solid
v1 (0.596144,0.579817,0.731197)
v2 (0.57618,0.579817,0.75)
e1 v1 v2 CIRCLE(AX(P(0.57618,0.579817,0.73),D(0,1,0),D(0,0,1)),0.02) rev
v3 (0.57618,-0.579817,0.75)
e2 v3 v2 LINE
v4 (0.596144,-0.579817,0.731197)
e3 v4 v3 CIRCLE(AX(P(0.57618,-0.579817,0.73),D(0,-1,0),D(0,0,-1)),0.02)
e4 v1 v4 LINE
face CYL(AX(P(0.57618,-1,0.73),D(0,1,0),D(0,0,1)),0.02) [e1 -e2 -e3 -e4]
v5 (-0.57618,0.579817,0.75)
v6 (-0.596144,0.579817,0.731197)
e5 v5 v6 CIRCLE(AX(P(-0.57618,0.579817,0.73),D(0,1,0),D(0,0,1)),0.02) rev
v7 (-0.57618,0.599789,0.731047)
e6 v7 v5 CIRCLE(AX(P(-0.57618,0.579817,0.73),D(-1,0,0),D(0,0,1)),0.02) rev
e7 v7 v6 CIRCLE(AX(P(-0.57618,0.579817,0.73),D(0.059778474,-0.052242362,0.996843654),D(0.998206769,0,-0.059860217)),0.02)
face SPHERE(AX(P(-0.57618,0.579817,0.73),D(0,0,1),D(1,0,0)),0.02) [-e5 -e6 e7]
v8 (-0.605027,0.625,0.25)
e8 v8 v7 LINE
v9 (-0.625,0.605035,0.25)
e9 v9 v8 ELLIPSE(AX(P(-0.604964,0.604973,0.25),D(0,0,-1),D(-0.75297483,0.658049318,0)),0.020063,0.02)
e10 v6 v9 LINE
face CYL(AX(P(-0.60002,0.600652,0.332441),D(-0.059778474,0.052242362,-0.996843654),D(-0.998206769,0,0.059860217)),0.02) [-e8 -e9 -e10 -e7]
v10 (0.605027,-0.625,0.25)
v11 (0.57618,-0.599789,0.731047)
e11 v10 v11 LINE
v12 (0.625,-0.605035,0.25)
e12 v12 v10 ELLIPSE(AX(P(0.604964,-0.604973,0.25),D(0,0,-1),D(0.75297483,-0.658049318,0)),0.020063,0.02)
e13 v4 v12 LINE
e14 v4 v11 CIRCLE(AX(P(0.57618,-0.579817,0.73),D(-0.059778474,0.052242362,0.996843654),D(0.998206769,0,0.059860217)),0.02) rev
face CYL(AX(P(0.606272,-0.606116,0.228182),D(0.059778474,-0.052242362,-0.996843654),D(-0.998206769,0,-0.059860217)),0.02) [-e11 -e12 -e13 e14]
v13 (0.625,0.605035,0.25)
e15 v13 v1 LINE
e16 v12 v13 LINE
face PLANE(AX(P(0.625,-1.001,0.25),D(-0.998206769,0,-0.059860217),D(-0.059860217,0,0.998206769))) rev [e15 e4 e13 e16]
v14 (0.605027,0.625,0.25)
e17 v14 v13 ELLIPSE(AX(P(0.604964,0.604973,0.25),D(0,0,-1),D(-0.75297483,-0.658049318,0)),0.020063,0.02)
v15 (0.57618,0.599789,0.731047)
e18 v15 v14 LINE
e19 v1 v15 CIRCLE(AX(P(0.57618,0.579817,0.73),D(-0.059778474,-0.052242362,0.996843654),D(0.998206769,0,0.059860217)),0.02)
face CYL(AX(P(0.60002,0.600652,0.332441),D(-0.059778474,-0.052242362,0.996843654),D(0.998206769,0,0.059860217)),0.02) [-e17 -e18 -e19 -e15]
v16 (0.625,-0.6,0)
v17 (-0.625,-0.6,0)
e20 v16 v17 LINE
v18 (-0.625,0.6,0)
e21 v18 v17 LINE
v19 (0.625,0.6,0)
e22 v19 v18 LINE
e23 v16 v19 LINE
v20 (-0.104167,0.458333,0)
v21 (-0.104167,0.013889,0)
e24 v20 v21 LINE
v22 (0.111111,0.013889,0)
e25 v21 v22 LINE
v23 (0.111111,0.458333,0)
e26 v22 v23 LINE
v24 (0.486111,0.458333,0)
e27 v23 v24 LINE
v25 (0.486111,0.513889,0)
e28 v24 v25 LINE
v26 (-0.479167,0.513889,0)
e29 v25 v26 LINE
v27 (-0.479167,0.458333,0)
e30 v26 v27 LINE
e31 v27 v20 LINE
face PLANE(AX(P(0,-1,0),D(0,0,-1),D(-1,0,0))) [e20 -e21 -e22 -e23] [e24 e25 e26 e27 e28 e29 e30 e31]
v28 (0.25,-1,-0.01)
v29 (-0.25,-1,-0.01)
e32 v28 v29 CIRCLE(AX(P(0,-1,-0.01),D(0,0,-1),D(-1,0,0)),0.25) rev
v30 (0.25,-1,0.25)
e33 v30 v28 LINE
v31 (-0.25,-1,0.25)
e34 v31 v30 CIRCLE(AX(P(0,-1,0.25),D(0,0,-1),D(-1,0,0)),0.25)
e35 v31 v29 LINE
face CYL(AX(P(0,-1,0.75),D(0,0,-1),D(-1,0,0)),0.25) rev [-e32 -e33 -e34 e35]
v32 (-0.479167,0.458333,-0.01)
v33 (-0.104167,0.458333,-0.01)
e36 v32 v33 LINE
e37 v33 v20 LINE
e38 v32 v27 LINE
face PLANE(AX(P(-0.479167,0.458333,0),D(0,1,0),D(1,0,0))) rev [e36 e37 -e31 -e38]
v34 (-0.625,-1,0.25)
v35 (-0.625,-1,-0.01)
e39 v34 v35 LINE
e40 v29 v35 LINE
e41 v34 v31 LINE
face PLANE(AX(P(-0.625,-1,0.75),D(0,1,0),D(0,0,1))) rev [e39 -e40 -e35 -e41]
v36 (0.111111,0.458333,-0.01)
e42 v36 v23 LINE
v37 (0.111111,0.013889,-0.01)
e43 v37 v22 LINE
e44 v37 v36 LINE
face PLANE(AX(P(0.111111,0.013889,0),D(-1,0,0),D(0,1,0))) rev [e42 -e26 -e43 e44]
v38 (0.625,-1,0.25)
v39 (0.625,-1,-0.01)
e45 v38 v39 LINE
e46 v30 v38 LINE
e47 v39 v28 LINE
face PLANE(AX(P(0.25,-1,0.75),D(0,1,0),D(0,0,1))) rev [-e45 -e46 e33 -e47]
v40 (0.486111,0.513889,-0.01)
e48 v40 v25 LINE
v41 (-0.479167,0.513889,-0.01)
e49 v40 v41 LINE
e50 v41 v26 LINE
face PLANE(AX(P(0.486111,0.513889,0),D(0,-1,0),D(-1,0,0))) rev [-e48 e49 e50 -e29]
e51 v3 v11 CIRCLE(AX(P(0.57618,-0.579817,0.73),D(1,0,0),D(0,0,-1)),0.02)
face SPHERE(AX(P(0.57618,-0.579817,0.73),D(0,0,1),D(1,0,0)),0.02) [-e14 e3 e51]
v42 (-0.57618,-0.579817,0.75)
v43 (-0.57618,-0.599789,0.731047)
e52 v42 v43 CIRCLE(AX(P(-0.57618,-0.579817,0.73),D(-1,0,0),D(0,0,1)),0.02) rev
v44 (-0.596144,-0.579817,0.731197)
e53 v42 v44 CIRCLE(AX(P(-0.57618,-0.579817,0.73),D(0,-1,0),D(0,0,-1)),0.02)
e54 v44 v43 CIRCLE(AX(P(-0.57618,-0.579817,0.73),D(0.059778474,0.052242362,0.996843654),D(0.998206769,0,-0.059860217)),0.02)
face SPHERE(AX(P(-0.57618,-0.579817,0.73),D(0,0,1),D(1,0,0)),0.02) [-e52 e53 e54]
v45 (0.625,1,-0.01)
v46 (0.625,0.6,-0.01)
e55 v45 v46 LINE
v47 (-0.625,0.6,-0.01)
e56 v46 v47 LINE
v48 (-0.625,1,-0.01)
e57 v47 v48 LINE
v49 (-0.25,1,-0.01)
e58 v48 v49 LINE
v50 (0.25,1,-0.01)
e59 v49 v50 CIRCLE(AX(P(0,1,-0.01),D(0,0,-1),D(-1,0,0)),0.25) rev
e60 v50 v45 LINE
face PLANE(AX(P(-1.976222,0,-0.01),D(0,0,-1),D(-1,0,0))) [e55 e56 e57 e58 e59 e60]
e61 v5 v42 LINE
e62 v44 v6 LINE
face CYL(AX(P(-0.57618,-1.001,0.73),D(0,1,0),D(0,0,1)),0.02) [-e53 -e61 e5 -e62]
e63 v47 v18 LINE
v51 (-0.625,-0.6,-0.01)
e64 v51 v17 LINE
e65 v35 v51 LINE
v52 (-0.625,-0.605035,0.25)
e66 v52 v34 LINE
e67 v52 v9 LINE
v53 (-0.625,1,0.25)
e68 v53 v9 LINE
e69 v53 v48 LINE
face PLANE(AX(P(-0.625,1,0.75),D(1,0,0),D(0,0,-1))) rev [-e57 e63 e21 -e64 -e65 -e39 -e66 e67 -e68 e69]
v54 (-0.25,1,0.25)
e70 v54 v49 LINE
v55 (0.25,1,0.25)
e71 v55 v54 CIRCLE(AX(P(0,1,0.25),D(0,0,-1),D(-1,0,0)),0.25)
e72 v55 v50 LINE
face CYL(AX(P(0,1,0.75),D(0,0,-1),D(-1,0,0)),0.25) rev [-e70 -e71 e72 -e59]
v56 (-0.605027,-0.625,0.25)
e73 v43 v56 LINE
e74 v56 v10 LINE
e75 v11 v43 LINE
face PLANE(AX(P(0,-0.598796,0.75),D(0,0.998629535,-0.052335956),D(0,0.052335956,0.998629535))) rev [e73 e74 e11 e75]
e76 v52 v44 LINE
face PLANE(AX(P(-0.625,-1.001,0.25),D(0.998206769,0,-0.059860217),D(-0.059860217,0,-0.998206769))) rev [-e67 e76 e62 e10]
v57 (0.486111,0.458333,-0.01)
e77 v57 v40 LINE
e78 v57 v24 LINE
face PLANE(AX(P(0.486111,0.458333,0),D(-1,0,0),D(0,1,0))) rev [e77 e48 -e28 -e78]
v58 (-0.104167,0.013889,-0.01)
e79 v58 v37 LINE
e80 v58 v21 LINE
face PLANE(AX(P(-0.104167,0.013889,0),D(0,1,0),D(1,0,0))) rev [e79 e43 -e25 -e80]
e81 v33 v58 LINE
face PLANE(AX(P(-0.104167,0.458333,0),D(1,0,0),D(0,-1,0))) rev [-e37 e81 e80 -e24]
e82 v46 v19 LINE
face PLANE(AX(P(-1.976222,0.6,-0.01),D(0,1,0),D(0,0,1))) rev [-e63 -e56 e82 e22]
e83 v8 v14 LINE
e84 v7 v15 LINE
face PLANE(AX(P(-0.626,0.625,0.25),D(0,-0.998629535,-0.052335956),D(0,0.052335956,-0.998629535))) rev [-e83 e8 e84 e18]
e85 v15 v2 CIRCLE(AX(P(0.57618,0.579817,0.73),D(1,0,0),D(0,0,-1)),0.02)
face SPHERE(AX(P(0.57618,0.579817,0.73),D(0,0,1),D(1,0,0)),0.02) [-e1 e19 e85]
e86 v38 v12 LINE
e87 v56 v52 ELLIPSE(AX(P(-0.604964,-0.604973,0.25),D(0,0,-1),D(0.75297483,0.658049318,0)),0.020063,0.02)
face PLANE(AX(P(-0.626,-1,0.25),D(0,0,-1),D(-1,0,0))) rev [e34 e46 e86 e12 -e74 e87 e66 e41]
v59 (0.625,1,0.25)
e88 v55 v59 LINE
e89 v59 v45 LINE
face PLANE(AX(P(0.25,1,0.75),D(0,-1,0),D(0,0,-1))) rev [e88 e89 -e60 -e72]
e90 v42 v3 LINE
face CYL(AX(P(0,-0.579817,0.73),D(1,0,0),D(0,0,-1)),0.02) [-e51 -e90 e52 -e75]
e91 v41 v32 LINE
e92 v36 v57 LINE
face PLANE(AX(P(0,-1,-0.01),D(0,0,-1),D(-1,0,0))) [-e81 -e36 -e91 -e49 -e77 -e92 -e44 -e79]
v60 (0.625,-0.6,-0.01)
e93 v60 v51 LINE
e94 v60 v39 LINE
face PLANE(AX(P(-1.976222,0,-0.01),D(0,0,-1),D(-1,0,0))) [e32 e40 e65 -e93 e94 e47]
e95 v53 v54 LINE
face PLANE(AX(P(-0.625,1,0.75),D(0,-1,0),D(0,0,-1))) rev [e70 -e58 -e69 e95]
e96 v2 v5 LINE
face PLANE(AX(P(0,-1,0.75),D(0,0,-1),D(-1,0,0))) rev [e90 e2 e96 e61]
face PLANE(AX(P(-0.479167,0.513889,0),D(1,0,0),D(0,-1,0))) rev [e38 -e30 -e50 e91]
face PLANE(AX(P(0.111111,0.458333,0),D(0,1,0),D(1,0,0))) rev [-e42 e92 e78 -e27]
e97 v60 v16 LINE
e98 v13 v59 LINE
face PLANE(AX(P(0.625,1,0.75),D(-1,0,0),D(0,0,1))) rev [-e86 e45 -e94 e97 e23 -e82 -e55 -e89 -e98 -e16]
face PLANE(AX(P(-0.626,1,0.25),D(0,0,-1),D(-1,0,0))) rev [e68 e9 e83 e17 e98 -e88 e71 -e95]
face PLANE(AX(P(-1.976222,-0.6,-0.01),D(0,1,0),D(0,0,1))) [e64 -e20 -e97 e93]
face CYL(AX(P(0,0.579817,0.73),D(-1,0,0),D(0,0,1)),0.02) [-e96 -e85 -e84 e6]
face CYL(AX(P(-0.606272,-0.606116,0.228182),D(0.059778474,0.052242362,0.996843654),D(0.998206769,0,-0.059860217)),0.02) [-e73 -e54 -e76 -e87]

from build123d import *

# Parameters (mm, degrees)
EXTRUDE_1_DEPTH     = 0.75
CUT_EXTRUDE_1_REACH = 3.768
SKETCH_2_W          = 0.5
SKETCH_2_H          = 0.375
EXTRUDE_START       = 0.01
EXTRUDE_2_DEPTH     = 0.01
WRAP_1_DEPTH        = 0.01
CUT_EXTRUDE_2_REACH = 3.896
CHAMFER_1_SIZE      = 0.5
CHAMFER_1_SIZE_2    = 0.02620389
CHAMFER_2_SIZE      = 0.02620389
CHAMFER_2_SIZE_2    = 0.5
FILLET_1_R          = 0.02


with BuildPart() as part:
    # 草图1 → 凸台-拉伸1 (new body)
    with BuildSketch(Plane.XY):
        with BuildLine():
            Line((-0.625, 1), (-0.25, 1))
            ThreePointArc((-0.25, 1), (0, 0.75), (0.25, 1))
            Line((0.25, 1), (0.625, 1))
            Line((0.625, 1), (0.625, -1))
            Line((0.625, -1), (0.25, -1))
            ThreePointArc((0.25, -1), (0, -0.75), (-0.25, -1))
            Line((-0.25, -1), (-0.625, -1))
            Line((-0.625, -1), (-0.625, 1))
        make_face()
    extrude(amount=EXTRUDE_1_DEPTH)

    # 草图2 → 切除-拉伸1 (cut, up to next)
    with BuildSketch(Plane(origin=(0.625, 0, 0), x_dir=(0, 0, -1), z_dir=(1, 0, 0)), mode=Mode.PRIVATE) as cut_extrude_1_sk1:
        with Locations((-0.5, 0.8125)):
            Rectangle(SKETCH_2_W, SKETCH_2_H)
    cut_extrude_1_tool1 = extrude(cut_extrude_1_sk1.sketch, amount=-CUT_EXTRUDE_1_REACH, mode=Mode.PRIVATE) & part.part
    # 草图2 → 切除-拉伸1 (cut, up to next)
    with BuildSketch(Plane(origin=(0.625, 0, 0), x_dir=(0, 0, -1), z_dir=(1, 0, 0)), mode=Mode.PRIVATE) as cut_extrude_1_sk2:
        with Locations((-0.5, -0.8125)):
            Rectangle(SKETCH_2_W, SKETCH_2_H)
    cut_extrude_1_tool2 = extrude(cut_extrude_1_sk2.sketch, amount=-CUT_EXTRUDE_1_REACH, mode=Mode.PRIVATE) & part.part
    add(cut_extrude_1_tool1.solids().sort_by_distance((0.625, 0.8125, 0.5))[0], mode=Mode.SUBTRACT)
    add(cut_extrude_1_tool2.solids().sort_by_distance((0.625, -0.8125, 0.5))[0], mode=Mode.SUBTRACT)

    # 草图3 → 凸台-拉伸2 (add)
    with BuildSketch(Plane(origin=(0, 0, 0), x_dir=(-1, 0, 0), z_dir=(0, 0, -1)).offset(EXTRUDE_START)):
        with BuildLine():
            Line((-0.625, 1), (-0.625, 0.6))
            Line((-0.625, 0.6), (0.625, 0.6))
            Line((0.625, 0.6), (0.625, 1))
            Line((0.625, 1), (0.25, 1))
            ThreePointArc((0.25, 1), (0, 0.75), (-0.25, 1))
            Line((-0.25, 1), (-0.625, 1))
        make_face()
        with BuildLine():
            Line((0.625, -0.6), (-0.625, -0.6))
            Line((-0.625, -0.6), (-0.625, -1))
            Line((-0.625, -1), (-0.25, -1))
            ThreePointArc((-0.25, -1), (0, -0.75), (0.25, -1))
            Line((0.25, -1), (0.625, -1))
            Line((0.625, -1), (0.625, -0.6))
        make_face()
    extrude(amount=-EXTRUDE_2_DEPTH)

    # 包覆1: read off the stored shape, not the designer's step
    # 包覆1 outline → 包覆1 (add)
    with BuildSketch(Plane(origin=(0, 0, 0), x_dir=(-1, 0, 0), z_dir=(0, 0, -1))):
        Polygon((0.104166667, 0.013888889), (0.104166667, 0.458333333), (0.479166667, 0.458333333), (0.479166667, 0.513888889), (-0.486111111, 0.513888889), (-0.486111111, 0.458333333), (-0.111111111, 0.458333333), (-0.111111111, 0.013888889), align=None)
    extrude(amount=WRAP_1_DEPTH)

    # 草图7 → 切除-拉伸2 (cut, up to next)
    with BuildSketch(Plane(origin=(0, 0.625, 0), x_dir=(1, 0, 0), z_dir=(0, 1, 0)), mode=Mode.PRIVATE) as cut_extrude_2_sk1:
        Polygon((-0.625, -0.25), (-0.595016124, -0.75), (-0.625, -0.75), align=None)
    cut_extrude_2_tool1 = extrude(cut_extrude_2_sk1.sketch, amount=-CUT_EXTRUDE_2_REACH, mode=Mode.PRIVATE) & part.part
    # 草图7 → 切除-拉伸2 (cut, up to next)
    with BuildSketch(Plane(origin=(0, 0.625, 0), x_dir=(1, 0, 0), z_dir=(0, 1, 0)), mode=Mode.PRIVATE) as cut_extrude_2_sk2:
        Polygon((0.595016124, -0.75), (0.625, -0.75), (0.625, -0.25), align=None)
    cut_extrude_2_tool2 = extrude(cut_extrude_2_sk2.sketch, amount=-CUT_EXTRUDE_2_REACH, mode=Mode.PRIVATE) & part.part
    add(cut_extrude_2_tool1.solids().sort_by_distance((-0.615005, 0.625, 0.583333))[0], mode=Mode.SUBTRACT)
    add(cut_extrude_2_tool2.solids().sort_by_distance((0.615005, 0.625, 0.583333))[0], mode=Mode.SUBTRACT)

    # 倒角1
    # the kernel refuses this chamfer: 0.5, 0.02620389 mm, written as the material it takes off along each edge
    with BuildSketch(Plane(origin=(1.894950234, 0.625, 0.75), x_dir=(0, 0, -1), z_dir=(-1, 0, 0))) as chamfer_1_piece_1_section:
        Polygon((CHAMFER_1_SIZE, 0), (0, CHAMFER_1_SIZE_2 * 0.99999998632), (0, 0), align=None)
    chamfer_1_piece_1 = extrude(amount=3.789900469, mode=Mode.PRIVATE)
    chamfer_1_piece_1 = split(chamfer_1_piece_1, bisect_by=Plane(origin=(1.894950234, 0.625, 0.25), z_dir=(0, 0, 1)), keep=Keep.TOP, mode=Mode.PRIVATE)
    add(chamfer_1_piece_1, mode=Mode.SUBTRACT)

    # 倒角2
    # the kernel refuses this chamfer: 0.5, 0.02620389 mm, written as the material it takes off along each edge
    with BuildSketch(Plane(origin=(1.894950234, -0.625, 0.75), x_dir=(0, 1, 0), z_dir=(-1, 0, 0))) as chamfer_2_piece_1_section:
        Polygon((CHAMFER_2_SIZE * 0.99999998632, 0), (0, CHAMFER_2_SIZE_2), (0, 0), align=None)
    chamfer_2_piece_1 = extrude(amount=3.789900469, mode=Mode.PRIVATE)
    chamfer_2_piece_1 = split(chamfer_2_piece_1, bisect_by=Plane(origin=(1.894950234, -0.625, 0.25), z_dir=(0, 0, 1)), keep=Keep.TOP, mode=Mode.PRIVATE)
    add(chamfer_2_piece_1, mode=Mode.SUBTRACT)

    # 圆角1
    # the kernel refuses this fillet: 0.02 mm, written as the material it takes off along each edge
    with BuildSketch(Plane(origin=(0.57617955, 0.579816819, 0.73), x_dir=(0.04124395278448508, 0.7247571544349799, -0.6877688590318859), z_dir=(0.5553605365793874, 0.5555957455592435, 0.618779477622459))) as fillet_1_piece_1_section:
        Polygon((-0.040070478, -0.040070478), (0.040070478, -0.040070478), (0.040070478, 0.040070478), (-0.040070478, 0.040070478), align=None)
    fillet_1_piece_1 = extrude(amount=0.040070478, mode=Mode.PRIVATE)
    fillet_1_piece_1 = split(fillet_1_piece_1, bisect_by=Plane(origin=(0.57617955, 0.579816819, 0.73), z_dir=(0, 1, 0)), keep=Keep.TOP, mode=Mode.PRIVATE)
    fillet_1_piece_1 = split(fillet_1_piece_1, bisect_by=Plane(origin=(0.57617955, 0.579816819, 0.73), z_dir=(1, 0, 0)), keep=Keep.TOP, mode=Mode.PRIVATE)
    fillet_1_piece_1 = split(fillet_1_piece_1, bisect_by=Plane(origin=(0.57617955, 0.579816819, 0.73), z_dir=(-0.05977847359904646, -0.052242362176689705, 0.9968436535828312)), keep=Keep.TOP, mode=Mode.PRIVATE)
    fillet_1_piece_1 = split(fillet_1_piece_1, bisect_by=Plane(origin=(0.596143685, 0.579816819, 0.731197204), z_dir=(-0.9982067693968444, 0, -0.0598602165909465)), keep=Keep.TOP, mode=Mode.PRIVATE)
    fillet_1_piece_1 = split(fillet_1_piece_1, bisect_by=Plane(origin=(0.57617955, 0.579816819, 0.75), z_dir=(0, 0, -1)), keep=Keep.TOP, mode=Mode.PRIVATE)
    fillet_1_piece_1 = split(fillet_1_piece_1, bisect_by=Plane(origin=(0.57617955, 0.59978941, 0.731046719), z_dir=(0, -0.9986295347545728, -0.05233595624296412)), keep=Keep.TOP, mode=Mode.PRIVATE)
    fillet_1_piece_1 = fillet_1_piece_1 - Plane(origin=(0.57617955, 0.579816819, 0.73), x_dir=(-0.5553605365793874, -0.5555957455592435, -0.618779477622459), z_dir=(0.04124395278448508, 0.7247571544349799, -0.6877688590318859)) * Sphere(FILLET_1_R, mode=Mode.PRIVATE)
    add(fillet_1_piece_1, mode=Mode.SUBTRACT)
    with BuildSketch(Plane(origin=(-0.57617955, 0.579816819, 0.73), x_dir=(0.7072564722746582, 0.7069570584028463, 0), z_dir=(-0.5553605365793893, 0.5555957455592451, 0.6187794776224558))) as fillet_1_piece_2_section:
        Polygon((-0.040070478, -0.040070478), (0.040070478, -0.040070478), (0.040070478, 0.040070478), (-0.040070478, 0.040070478), align=None)
    fillet_1_piece_2 = extrude(amount=0.040070478, mode=Mode.PRIVATE)
    fillet_1_piece_2 = split(fillet_1_piece_2, bisect_by=Plane(origin=(-0.57617955, 0.579816819, 0.73), z_dir=(-1, 0, 0)), keep=Keep.TOP, mode=Mode.PRIVATE)
    fillet_1_piece_2 = split(fillet_1_piece_2, bisect_by=Plane(origin=(-0.57617955, 0.579816819, 0.73), z_dir=(0.0597784735990376, -0.05224236217668974, 0.9968436535828318)), keep=Keep.TOP, mode=Mode.PRIVATE)
    fillet_1_piece_2 = split(fillet_1_piece_2, bisect_by=Plane(origin=(-0.57617955, 0.579816819, 0.73), z_dir=(0, 1, 0)), keep=Keep.TOP, mode=Mode.PRIVATE)
    fillet_1_piece_2 = split(fillet_1_piece_2, bisect_by=Plane(origin=(-0.57617955, 0.579816819, 0.75), z_dir=(0, 0, -1)), keep=Keep.TOP, mode=Mode.PRIVATE)
    fillet_1_piece_2 = split(fillet_1_piece_2, bisect_by=Plane(origin=(-0.57617955, 0.59978941, 0.731046719), z_dir=(0, -0.9986295347545728, -0.05233595624296412)), keep=Keep.TOP, mode=Mode.PRIVATE)
    fillet_1_piece_2 = split(fillet_1_piece_2, bisect_by=Plane(origin=(-0.596143685, 0.579816819, 0.731197204), z_dir=(0.998206769396845, 0, -0.05986021659093763)), keep=Keep.TOP, mode=Mode.PRIVATE)
    fillet_1_piece_2 = fillet_1_piece_2 - Plane(origin=(-0.57617955, 0.579816819, 0.73), x_dir=(0.5553605365793893, -0.5555957455592451, -0.6187794776224558), z_dir=(0.7072564722746582, 0.7069570584028463, 0)) * Sphere(FILLET_1_R, mode=Mode.PRIVATE)
    add(fillet_1_piece_2, mode=Mode.SUBTRACT)
    with BuildSketch(Plane(origin=(0.57617955, -0.579816819, 0.73), x_dir=(-0.04124395278448508, 0.7247571544349799, 0.6877688590318859), z_dir=(0.5553605365793874, -0.5555957455592435, 0.618779477622459))) as fillet_1_piece_3_section:
        Polygon((-0.040070478, -0.040070478), (0.040070478, -0.040070478), (0.040070478, 0.040070478), (-0.040070478, 0.040070478), align=None)
    fillet_1_piece_3 = extrude(amount=0.040070478, mode=Mode.PRIVATE)
    fillet_1_piece_3 = split(fillet_1_piece_3, bisect_by=Plane(origin=(0.57617955, -0.579816819, 0.73), z_dir=(0, -1, 0)), keep=Keep.TOP, mode=Mode.PRIVATE)
    fillet_1_piece_3 = split(fillet_1_piece_3, bisect_by=Plane(origin=(0.57617955, -0.579816819, 0.73), z_dir=(1, 0, 0)), keep=Keep.TOP, mode=Mode.PRIVATE)
    fillet_1_piece_3 = split(fillet_1_piece_3, bisect_by=Plane(origin=(0.57617955, -0.579816819, 0.73), z_dir=(-0.05977847359904646, 0.052242362176689705, 0.9968436535828312)), keep=Keep.TOP, mode=Mode.PRIVATE)
    fillet_1_piece_3 = split(fillet_1_piece_3, bisect_by=Plane(origin=(0.596143685, -0.579816819, 0.731197204), z_dir=(-0.9982067693968444, 0, -0.0598602165909465)), keep=Keep.TOP, mode=Mode.PRIVATE)
    fillet_1_piece_3 = split(fillet_1_piece_3, bisect_by=Plane(origin=(0.57617955, -0.579816819, 0.75), z_dir=(0, 0, -1)), keep=Keep.TOP, mode=Mode.PRIVATE)
    fillet_1_piece_3 = split(fillet_1_piece_3, bisect_by=Plane(origin=(0.57617955, -0.59978941, 0.731046719), z_dir=(0, 0.9986295347545728, -0.05233595624296412)), keep=Keep.TOP, mode=Mode.PRIVATE)
    fillet_1_piece_3 = fillet_1_piece_3 - Plane(origin=(0.57617955, -0.579816819, 0.73), x_dir=(-0.5553605365793874, 0.5555957455592435, -0.618779477622459), z_dir=(-0.04124395278448508, 0.7247571544349799, 0.6877688590318859)) * Sphere(FILLET_1_R, mode=Mode.PRIVATE)
    add(fillet_1_piece_3, mode=Mode.SUBTRACT)
    with BuildSketch(Plane(origin=(-0.57617955, -0.579816819, 0.73), x_dir=(-0.041243952784478954, -0.72475715443498, -0.687768859031886), z_dir=(-0.5553605365793893, -0.5555957455592451, 0.6187794776224558))) as fillet_1_piece_4_section:
        Polygon((-0.040070478, -0.040070478), (0.040070478, -0.040070478), (0.040070478, 0.040070478), (-0.040070478, 0.040070478), align=None)
    fillet_1_piece_4 = extrude(amount=0.040070478, mode=Mode.PRIVATE)
    fillet_1_piece_4 = split(fillet_1_piece_4, bisect_by=Plane(origin=(-0.57617955, -0.579816819, 0.73), z_dir=(0.0597784735990376, 0.05224236217668974, 0.9968436535828318)), keep=Keep.TOP, mode=Mode.PRIVATE)
    fillet_1_piece_4 = split(fillet_1_piece_4, bisect_by=Plane(origin=(-0.57617955, -0.579816819, 0.73), z_dir=(-1, 0, 0)), keep=Keep.TOP, mode=Mode.PRIVATE)
    fillet_1_piece_4 = split(fillet_1_piece_4, bisect_by=Plane(origin=(-0.57617955, -0.579816819, 0.73), z_dir=(0, -1, 0)), keep=Keep.TOP, mode=Mode.PRIVATE)
    fillet_1_piece_4 = split(fillet_1_piece_4, bisect_by=Plane(origin=(-0.596143685, -0.579816819, 0.731197204), z_dir=(0.998206769396845, 0, -0.05986021659093763)), keep=Keep.TOP, mode=Mode.PRIVATE)
    fillet_1_piece_4 = split(fillet_1_piece_4, bisect_by=Plane(origin=(-0.57617955, -0.59978941, 0.731046719), z_dir=(0, 0.9986295347545728, -0.05233595624296412)), keep=Keep.TOP, mode=Mode.PRIVATE)
    fillet_1_piece_4 = split(fillet_1_piece_4, bisect_by=Plane(origin=(-0.57617955, -0.579816819, 0.75), z_dir=(0, 0, -1)), keep=Keep.TOP, mode=Mode.PRIVATE)
    fillet_1_piece_4 = fillet_1_piece_4 - Plane(origin=(-0.57617955, -0.579816819, 0.73), x_dir=(0.5553605365793893, 0.5555957455592451, -0.6187794776224558), z_dir=(-0.041243952784478954, -0.72475715443498, -0.687768859031886)) * Sphere(FILLET_1_R, mode=Mode.PRIVATE)
    add(fillet_1_piece_4, mode=Mode.SUBTRACT)
    with BuildSketch(Plane(origin=(0.596081336, 0.599727034, 0.732236916), x_dir=(-0.9982116679813796, 0.0031285635785502862, -0.059696549278554306), z_dir=(0.059778473599046464, 0.05224236217668971, -0.9968436535828313))) as fillet_1_piece_5_section:
        with BuildLine():
            CenterArc((FILLET_1_R * 0.996872050334, -FILLET_1_R), FILLET_1_R, 90, 89.8205011)
            Line((-FILLET_1_R * 0.00312304230512, -FILLET_1_R * 0.996867158324), (0, 0))
            Line((0, 0), (FILLET_1_R * 0.996872050334, 0))
        make_face()
    fillet_1_piece_5 = extrude(amount=0.533607444, mode=Mode.PRIVATE)
    fillet_1_piece_5 = split(fillet_1_piece_5, bisect_by=Plane(origin=(0.596081336, 0.599727034, 0.25), z_dir=(0, 0, 1)), keep=Keep.TOP, mode=Mode.PRIVATE)
    add(fillet_1_piece_5, mode=Mode.SUBTRACT)
    with BuildSketch(Plane(origin=(0.57617955, 0.59879611, 0.75), x_dir=(0, 0.05233595624296042, -0.9986295347545731), z_dir=(-1, 0, 0)), Plane(origin=(0.57617955, -0.59879611, 0.75), x_dir=(0, 1, 0), z_dir=(-1, 0, 0))) as fillet_1_piece_6:
        with BuildLine():
            CenterArc((FILLET_1_R * 0.948964566715, FILLET_1_R), FILLET_1_R, 183, 87)
            Line((-FILLET_1_R * 0.0496649680397, FILLET_1_R * 0.947664043757), (0, 0))
            Line((0, 0), (FILLET_1_R * 0.948964566715, 0))
        make_face()
    extrude(amount=1.152359099, mode=Mode.SUBTRACT)
    with BuildSketch(Plane(origin=(-0.596081336, 0.599727034, 0.732236916), x_dir=(-0.003127239115103472, -0.9986344354137802, -0.052148679574054314), z_dir=(-0.0597784735990376, 0.05224236217668974, -0.9968436535828318))) as fillet_1_piece_7_section:
        with BuildLine():
            CenterArc((FILLET_1_R * 0.996872050334, -FILLET_1_R), FILLET_1_R, 90, 89.8205011)
            Line((-FILLET_1_R * 0.00312304230511, -FILLET_1_R * 0.996867158324), (0, 0))
            Line((0, 0), (FILLET_1_R * 0.996872050334, 0))
        make_face()
    fillet_1_piece_7 = extrude(amount=0.533607444, mode=Mode.PRIVATE)
    fillet_1_piece_7 = split(fillet_1_piece_7, bisect_by=Plane(origin=(-0.596081336, 0.599727034, 0.25), z_dir=(0, 0, 1)), keep=Keep.TOP, mode=Mode.PRIVATE)
    add(fillet_1_piece_7, mode=Mode.SUBTRACT)
    with BuildSketch(Plane(origin=(0.595016124, 0.579816819, 0.75), x_dir=(0.05986021659094882, 0, -0.9982067693968444), z_dir=(0, -1, 0))) as fillet_1_piece_8:
        with BuildLine():
            CenterArc((FILLET_1_R * 0.941828699456, -FILLET_1_R), FILLET_1_R, 90, 86.568210653)
            Line((-FILLET_1_R * 0.056378069941, -FILLET_1_R * 0.940139783409), (0, 0))
            Line((0, 0), (FILLET_1_R * 0.941828699456, 0))
        make_face()
    extrude(amount=1.159633638, mode=Mode.SUBTRACT)
    with BuildSketch(Plane(origin=(-0.595016124, 0.579816819, 0.75), x_dir=(-0.05986021659093708, 0, -0.998206769396845), z_dir=(0, -1, 0))) as fillet_1_piece_9:
        with BuildLine():
            CenterArc((FILLET_1_R * 0.941828699456, FILLET_1_R), FILLET_1_R, 183.431789347, 86.568210653)
            Line((-FILLET_1_R * 0.056378069941, FILLET_1_R * 0.940139783409), (0, 0))
            Line((0, 0), (FILLET_1_R * 0.941828699456, 0))
        make_face()
    extrude(amount=1.159633638, mode=Mode.SUBTRACT)
    with BuildSketch(Plane(origin=(0.627979574, -0.627603948, 0.200313721), x_dir=(0.003127239115114234, 0.9986344354137802, -0.05214867957405363), z_dir=(-0.059778473599046464, 0.05224236217668971, 0.9968436535828313))) as fillet_1_piece_10_section:
        with BuildLine():
            CenterArc((FILLET_1_R * 0.996872050334, FILLET_1_R), FILLET_1_R, 180.1794989, 89.8205011)
            Line((-FILLET_1_R * 0.00312304230511, FILLET_1_R * 0.996867158324), (0, 0))
            Line((0, 0), (FILLET_1_R * 0.996872050334, 0))
        make_face()
    fillet_1_piece_10 = extrude(amount=0.533607444, mode=Mode.PRIVATE)
    fillet_1_piece_10 = split(fillet_1_piece_10, bisect_by=Plane(origin=(0.627979574, -0.627603948, 0.25), z_dir=(0, 0, 1)), keep=Keep.TOP, mode=Mode.PRIVATE)
    add(fillet_1_piece_10, mode=Mode.SUBTRACT)
    with BuildSketch(Plane(origin=(-0.627979574, -0.627603948, 0.200313721), x_dir=(-0.0031272391150979234, 0.9986344354137803, -0.052148679574054654), z_dir=(0.0597784735990376, 0.05224236217668974, 0.9968436535828318))) as fillet_1_piece_11_section:
        with BuildLine():
            CenterArc((FILLET_1_R * 0.996872050334, -FILLET_1_R), FILLET_1_R, 90, 89.8205011)
            Line((-FILLET_1_R * 0.0031230423051, -FILLET_1_R * 0.996867158324), (0, 0))
            Line((0, 0), (FILLET_1_R * 0.996872050334, 0))
        make_face()
    fillet_1_piece_11 = extrude(amount=0.533607444, mode=Mode.PRIVATE)
    fillet_1_piece_11 = split(fillet_1_piece_11, bisect_by=Plane(origin=(-0.627979574, -0.627603948, 0.25), z_dir=(0, 0, 1)), keep=Keep.TOP, mode=Mode.PRIVATE)
    add(fillet_1_piece_11, mode=Mode.SUBTRACT)


solid = part.part
